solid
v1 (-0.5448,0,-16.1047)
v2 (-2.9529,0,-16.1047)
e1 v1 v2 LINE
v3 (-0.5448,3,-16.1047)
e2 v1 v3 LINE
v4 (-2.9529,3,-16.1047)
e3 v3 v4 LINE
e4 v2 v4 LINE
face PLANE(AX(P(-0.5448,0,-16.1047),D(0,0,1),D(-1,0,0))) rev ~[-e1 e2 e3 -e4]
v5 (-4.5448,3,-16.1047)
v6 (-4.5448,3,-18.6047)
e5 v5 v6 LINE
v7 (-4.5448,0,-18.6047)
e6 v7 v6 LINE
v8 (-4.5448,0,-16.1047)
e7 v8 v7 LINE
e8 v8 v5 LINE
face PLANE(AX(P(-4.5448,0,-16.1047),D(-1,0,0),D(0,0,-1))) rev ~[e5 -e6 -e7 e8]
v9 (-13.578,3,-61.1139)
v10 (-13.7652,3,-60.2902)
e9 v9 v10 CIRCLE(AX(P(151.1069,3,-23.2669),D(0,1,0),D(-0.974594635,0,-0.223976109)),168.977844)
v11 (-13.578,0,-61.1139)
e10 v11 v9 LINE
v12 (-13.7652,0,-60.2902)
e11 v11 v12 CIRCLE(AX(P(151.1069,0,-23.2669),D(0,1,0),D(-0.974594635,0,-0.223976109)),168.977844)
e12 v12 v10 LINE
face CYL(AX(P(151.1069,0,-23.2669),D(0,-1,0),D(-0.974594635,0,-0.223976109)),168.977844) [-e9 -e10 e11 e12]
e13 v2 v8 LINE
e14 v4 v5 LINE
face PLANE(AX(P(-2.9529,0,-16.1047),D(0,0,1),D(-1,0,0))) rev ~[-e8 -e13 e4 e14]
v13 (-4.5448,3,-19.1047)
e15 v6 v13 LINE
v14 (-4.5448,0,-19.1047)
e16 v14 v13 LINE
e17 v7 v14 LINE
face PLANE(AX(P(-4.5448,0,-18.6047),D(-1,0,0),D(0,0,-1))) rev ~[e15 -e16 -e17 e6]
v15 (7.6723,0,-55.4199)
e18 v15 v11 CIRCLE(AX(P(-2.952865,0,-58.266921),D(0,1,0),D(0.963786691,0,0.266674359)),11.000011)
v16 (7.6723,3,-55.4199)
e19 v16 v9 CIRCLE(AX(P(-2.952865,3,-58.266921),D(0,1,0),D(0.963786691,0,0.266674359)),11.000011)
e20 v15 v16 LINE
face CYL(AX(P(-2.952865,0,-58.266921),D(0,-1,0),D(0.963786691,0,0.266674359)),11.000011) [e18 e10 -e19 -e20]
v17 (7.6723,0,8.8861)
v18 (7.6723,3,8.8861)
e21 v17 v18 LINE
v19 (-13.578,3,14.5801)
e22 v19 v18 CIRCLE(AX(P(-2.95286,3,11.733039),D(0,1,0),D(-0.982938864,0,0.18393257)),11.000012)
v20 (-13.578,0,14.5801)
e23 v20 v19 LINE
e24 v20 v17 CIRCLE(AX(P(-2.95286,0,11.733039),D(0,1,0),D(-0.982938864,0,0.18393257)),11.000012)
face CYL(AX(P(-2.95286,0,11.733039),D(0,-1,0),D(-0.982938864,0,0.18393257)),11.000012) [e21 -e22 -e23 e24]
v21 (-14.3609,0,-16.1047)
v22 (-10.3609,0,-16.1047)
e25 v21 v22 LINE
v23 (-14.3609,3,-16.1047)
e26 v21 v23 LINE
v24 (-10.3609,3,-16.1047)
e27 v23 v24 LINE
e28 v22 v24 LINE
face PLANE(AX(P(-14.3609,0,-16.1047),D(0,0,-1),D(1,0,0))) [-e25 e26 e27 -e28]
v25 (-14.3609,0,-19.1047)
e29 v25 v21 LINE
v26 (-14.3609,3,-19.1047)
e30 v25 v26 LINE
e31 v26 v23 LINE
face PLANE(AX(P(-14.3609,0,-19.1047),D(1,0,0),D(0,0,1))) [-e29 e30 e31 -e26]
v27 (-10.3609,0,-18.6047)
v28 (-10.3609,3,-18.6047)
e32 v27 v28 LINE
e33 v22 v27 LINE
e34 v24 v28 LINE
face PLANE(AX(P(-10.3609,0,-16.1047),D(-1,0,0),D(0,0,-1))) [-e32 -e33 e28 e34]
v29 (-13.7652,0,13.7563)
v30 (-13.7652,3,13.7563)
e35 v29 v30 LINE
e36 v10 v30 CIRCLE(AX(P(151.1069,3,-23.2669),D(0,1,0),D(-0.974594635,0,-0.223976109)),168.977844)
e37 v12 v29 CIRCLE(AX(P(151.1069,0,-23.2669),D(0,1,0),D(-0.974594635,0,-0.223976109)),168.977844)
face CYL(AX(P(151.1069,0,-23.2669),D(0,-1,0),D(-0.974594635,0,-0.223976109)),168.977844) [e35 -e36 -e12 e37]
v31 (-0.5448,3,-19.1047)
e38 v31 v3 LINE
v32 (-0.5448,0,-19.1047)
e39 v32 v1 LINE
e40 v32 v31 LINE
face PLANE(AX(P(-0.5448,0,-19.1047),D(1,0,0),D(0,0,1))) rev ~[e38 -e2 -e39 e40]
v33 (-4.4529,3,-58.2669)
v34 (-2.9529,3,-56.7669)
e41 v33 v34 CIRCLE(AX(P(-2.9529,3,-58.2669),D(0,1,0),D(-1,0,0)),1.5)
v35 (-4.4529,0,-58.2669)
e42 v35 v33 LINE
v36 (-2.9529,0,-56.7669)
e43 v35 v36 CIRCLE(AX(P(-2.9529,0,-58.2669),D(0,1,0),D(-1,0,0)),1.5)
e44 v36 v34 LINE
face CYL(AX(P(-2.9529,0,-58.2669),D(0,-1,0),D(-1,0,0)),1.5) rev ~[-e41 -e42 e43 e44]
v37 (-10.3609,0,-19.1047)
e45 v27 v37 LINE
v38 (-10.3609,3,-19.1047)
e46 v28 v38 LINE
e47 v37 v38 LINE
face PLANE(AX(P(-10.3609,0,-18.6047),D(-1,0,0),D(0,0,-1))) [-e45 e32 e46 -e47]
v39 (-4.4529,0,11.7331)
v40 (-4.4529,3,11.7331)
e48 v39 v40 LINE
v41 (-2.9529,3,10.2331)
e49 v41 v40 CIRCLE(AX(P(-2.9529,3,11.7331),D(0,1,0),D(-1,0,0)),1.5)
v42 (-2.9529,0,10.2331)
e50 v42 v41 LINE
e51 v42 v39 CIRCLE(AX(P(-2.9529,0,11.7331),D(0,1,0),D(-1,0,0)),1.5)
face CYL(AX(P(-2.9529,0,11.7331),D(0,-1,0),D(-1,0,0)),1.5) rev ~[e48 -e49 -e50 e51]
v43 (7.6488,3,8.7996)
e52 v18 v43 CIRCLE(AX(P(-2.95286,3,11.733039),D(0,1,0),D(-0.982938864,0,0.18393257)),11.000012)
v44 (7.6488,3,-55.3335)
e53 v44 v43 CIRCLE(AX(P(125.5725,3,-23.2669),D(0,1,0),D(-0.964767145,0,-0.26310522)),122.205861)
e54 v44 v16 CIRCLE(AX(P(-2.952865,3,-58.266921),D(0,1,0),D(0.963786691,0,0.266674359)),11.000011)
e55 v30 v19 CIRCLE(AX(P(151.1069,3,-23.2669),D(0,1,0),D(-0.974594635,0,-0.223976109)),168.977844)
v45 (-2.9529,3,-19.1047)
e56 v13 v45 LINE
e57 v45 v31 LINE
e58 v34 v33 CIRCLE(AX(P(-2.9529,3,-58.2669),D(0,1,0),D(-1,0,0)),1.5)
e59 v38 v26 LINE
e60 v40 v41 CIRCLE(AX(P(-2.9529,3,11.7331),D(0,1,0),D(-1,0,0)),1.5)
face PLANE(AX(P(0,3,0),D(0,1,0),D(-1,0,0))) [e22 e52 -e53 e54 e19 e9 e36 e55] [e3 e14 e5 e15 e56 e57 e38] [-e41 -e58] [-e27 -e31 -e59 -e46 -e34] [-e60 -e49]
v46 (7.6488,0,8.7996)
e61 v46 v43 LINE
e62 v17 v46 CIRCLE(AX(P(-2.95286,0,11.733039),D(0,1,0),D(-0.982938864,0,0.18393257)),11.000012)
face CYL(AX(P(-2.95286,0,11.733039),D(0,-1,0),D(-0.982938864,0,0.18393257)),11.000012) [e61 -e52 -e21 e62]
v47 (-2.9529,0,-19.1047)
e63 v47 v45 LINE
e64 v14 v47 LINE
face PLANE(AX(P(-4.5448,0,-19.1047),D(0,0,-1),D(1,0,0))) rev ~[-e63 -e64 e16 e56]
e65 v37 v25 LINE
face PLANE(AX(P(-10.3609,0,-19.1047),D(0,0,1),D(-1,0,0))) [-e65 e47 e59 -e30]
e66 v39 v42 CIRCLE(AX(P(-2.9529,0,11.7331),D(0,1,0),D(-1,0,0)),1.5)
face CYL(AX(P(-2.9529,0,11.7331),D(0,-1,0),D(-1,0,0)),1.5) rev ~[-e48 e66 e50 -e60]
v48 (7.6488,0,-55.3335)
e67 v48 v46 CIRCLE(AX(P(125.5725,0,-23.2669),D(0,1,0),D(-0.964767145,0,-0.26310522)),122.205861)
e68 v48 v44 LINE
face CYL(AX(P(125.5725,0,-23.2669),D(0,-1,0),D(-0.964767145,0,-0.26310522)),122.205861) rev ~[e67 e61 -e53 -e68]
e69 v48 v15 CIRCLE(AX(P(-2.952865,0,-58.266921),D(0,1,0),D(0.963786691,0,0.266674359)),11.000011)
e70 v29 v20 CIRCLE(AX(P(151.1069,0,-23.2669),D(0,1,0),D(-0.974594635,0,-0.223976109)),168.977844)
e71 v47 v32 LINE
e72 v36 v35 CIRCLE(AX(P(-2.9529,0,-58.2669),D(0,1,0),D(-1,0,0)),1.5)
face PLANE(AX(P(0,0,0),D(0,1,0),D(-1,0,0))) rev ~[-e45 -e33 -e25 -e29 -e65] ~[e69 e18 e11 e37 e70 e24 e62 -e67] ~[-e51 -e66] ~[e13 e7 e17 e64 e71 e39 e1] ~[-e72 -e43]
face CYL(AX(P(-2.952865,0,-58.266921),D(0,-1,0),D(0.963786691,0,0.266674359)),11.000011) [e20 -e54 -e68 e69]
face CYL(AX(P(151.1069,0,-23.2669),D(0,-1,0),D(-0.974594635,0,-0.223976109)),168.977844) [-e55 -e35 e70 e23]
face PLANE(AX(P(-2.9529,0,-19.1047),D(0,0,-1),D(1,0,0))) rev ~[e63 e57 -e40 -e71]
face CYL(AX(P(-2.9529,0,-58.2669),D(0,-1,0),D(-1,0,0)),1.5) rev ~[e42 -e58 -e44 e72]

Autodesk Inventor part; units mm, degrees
ref_plane "YZ Plane" through (0, 0, 0) normal (1, 0, 0) x (0, 1, 0)
ref_plane "XZ Plane" through (0, 0, 0) normal (0, 1, 0) x (-1, 0, 0)
ref_plane "XY Plane" through (0, 0, 0) normal (0, 0, 1) x (1, 0, 0)
sketch "Sketch1" plane through (0, 0, 0) normal (0, 1, 0) x (-1, 0, 0)
  arc A0 (13.7652, 13.7563) -> (-7.6488, 8.7996) centre (2.9529, 11.7331) ccw
  arc A1 (-7.6488, -55.3335) -> (13.7652, -60.2902) centre (2.9529, -58.2669) ccw
  arc A2 (-7.6723, -55.4199) -> (-7.6723, 8.8861) centre (-125.5725, -23.2669) ccw
  arc A3 (13.578, -61.1139) -> (13.578, 14.5801) centre (-151.1069, -23.2669) ccw
  circle A4 centre (2.9529, 11.7331) radius 1.5
  circle A5 centre (2.9529, -58.2669) radius 1.5
  line L0 (14.3609, -16.1047) -> (10.3609, -16.1047)
  line L1 (10.3609, -16.1047) -> (10.3609, -19.1047)
  line L2 (10.3609, -19.1047) -> (14.3609, -19.1047)
  line L3 (14.3609, -19.1047) -> (14.3609, -16.1047)
  line L4 (14.3609, -11.7669) -> (10.3609, -14.7669) construction
  line L5 (10.3609, -11.7669) -> (14.3609, -14.7669) construction
  line L6 (0.5448, -16.1047) -> (4.5448, -16.1047)
  line L7 (4.5448, -16.1047) -> (4.5448, -19.1047)
  line L8 (4.5448, -19.1047) -> (0.5448, -19.1047)
  line L9 (0.5448, -19.1047) -> (0.5448, -16.1047)
  line L10 (12.3609, -13.2669) -> (12.3609, -13.2669)
  line L11 (2.9529, 11.7331) -> (2.9529, -58.2669)
  line L12 (10.3609, -18.6047) -> (4.5448, -18.6047)
  line L13 (7.4529, -18.6047) -> (7.4529, -17.6047)
  point P0 (0, 0)
  dimension "d0" = 22
  dimension "d1" = 22
  dimension "d2" = 70
  dimension "d3" = 3
  dimension "d4" = 3
  dimension "d21" = 4
  dimension "d22" = 3
  dimension "d25" = 0
  dimension "d26" = 1
sketch "Sketch2" plane through (0, 0, 0) normal (0, 1, 0) x (-1, 0, 0)
  point P0 (0, 0)
extrude "Extrusion1" add sketch "Sketch1" along normal blind 3 contours A3 A1 A2 A0
sketch "Sketch3" plane through (0, 0, 0) normal (0, -1, 0) x (1, 0, 0)
  point P0 (0, 0)
sketch "Sketch4" plane through (0, 0, 0) normal (0, -1, 0) x (1, 0, 0)
  point P0 (0, 0)
sketch "Sketch5" plane through (0, 3, 0) normal (0, 1, 0) x (1, 0, 0)
  point P0 (0, 0)
sketch "Sketch6" plane through (0, 3, 0) normal (0, 1, 0) x (1, 0, 0)
  point P0 (0, 0)
properties part number "fem2"
